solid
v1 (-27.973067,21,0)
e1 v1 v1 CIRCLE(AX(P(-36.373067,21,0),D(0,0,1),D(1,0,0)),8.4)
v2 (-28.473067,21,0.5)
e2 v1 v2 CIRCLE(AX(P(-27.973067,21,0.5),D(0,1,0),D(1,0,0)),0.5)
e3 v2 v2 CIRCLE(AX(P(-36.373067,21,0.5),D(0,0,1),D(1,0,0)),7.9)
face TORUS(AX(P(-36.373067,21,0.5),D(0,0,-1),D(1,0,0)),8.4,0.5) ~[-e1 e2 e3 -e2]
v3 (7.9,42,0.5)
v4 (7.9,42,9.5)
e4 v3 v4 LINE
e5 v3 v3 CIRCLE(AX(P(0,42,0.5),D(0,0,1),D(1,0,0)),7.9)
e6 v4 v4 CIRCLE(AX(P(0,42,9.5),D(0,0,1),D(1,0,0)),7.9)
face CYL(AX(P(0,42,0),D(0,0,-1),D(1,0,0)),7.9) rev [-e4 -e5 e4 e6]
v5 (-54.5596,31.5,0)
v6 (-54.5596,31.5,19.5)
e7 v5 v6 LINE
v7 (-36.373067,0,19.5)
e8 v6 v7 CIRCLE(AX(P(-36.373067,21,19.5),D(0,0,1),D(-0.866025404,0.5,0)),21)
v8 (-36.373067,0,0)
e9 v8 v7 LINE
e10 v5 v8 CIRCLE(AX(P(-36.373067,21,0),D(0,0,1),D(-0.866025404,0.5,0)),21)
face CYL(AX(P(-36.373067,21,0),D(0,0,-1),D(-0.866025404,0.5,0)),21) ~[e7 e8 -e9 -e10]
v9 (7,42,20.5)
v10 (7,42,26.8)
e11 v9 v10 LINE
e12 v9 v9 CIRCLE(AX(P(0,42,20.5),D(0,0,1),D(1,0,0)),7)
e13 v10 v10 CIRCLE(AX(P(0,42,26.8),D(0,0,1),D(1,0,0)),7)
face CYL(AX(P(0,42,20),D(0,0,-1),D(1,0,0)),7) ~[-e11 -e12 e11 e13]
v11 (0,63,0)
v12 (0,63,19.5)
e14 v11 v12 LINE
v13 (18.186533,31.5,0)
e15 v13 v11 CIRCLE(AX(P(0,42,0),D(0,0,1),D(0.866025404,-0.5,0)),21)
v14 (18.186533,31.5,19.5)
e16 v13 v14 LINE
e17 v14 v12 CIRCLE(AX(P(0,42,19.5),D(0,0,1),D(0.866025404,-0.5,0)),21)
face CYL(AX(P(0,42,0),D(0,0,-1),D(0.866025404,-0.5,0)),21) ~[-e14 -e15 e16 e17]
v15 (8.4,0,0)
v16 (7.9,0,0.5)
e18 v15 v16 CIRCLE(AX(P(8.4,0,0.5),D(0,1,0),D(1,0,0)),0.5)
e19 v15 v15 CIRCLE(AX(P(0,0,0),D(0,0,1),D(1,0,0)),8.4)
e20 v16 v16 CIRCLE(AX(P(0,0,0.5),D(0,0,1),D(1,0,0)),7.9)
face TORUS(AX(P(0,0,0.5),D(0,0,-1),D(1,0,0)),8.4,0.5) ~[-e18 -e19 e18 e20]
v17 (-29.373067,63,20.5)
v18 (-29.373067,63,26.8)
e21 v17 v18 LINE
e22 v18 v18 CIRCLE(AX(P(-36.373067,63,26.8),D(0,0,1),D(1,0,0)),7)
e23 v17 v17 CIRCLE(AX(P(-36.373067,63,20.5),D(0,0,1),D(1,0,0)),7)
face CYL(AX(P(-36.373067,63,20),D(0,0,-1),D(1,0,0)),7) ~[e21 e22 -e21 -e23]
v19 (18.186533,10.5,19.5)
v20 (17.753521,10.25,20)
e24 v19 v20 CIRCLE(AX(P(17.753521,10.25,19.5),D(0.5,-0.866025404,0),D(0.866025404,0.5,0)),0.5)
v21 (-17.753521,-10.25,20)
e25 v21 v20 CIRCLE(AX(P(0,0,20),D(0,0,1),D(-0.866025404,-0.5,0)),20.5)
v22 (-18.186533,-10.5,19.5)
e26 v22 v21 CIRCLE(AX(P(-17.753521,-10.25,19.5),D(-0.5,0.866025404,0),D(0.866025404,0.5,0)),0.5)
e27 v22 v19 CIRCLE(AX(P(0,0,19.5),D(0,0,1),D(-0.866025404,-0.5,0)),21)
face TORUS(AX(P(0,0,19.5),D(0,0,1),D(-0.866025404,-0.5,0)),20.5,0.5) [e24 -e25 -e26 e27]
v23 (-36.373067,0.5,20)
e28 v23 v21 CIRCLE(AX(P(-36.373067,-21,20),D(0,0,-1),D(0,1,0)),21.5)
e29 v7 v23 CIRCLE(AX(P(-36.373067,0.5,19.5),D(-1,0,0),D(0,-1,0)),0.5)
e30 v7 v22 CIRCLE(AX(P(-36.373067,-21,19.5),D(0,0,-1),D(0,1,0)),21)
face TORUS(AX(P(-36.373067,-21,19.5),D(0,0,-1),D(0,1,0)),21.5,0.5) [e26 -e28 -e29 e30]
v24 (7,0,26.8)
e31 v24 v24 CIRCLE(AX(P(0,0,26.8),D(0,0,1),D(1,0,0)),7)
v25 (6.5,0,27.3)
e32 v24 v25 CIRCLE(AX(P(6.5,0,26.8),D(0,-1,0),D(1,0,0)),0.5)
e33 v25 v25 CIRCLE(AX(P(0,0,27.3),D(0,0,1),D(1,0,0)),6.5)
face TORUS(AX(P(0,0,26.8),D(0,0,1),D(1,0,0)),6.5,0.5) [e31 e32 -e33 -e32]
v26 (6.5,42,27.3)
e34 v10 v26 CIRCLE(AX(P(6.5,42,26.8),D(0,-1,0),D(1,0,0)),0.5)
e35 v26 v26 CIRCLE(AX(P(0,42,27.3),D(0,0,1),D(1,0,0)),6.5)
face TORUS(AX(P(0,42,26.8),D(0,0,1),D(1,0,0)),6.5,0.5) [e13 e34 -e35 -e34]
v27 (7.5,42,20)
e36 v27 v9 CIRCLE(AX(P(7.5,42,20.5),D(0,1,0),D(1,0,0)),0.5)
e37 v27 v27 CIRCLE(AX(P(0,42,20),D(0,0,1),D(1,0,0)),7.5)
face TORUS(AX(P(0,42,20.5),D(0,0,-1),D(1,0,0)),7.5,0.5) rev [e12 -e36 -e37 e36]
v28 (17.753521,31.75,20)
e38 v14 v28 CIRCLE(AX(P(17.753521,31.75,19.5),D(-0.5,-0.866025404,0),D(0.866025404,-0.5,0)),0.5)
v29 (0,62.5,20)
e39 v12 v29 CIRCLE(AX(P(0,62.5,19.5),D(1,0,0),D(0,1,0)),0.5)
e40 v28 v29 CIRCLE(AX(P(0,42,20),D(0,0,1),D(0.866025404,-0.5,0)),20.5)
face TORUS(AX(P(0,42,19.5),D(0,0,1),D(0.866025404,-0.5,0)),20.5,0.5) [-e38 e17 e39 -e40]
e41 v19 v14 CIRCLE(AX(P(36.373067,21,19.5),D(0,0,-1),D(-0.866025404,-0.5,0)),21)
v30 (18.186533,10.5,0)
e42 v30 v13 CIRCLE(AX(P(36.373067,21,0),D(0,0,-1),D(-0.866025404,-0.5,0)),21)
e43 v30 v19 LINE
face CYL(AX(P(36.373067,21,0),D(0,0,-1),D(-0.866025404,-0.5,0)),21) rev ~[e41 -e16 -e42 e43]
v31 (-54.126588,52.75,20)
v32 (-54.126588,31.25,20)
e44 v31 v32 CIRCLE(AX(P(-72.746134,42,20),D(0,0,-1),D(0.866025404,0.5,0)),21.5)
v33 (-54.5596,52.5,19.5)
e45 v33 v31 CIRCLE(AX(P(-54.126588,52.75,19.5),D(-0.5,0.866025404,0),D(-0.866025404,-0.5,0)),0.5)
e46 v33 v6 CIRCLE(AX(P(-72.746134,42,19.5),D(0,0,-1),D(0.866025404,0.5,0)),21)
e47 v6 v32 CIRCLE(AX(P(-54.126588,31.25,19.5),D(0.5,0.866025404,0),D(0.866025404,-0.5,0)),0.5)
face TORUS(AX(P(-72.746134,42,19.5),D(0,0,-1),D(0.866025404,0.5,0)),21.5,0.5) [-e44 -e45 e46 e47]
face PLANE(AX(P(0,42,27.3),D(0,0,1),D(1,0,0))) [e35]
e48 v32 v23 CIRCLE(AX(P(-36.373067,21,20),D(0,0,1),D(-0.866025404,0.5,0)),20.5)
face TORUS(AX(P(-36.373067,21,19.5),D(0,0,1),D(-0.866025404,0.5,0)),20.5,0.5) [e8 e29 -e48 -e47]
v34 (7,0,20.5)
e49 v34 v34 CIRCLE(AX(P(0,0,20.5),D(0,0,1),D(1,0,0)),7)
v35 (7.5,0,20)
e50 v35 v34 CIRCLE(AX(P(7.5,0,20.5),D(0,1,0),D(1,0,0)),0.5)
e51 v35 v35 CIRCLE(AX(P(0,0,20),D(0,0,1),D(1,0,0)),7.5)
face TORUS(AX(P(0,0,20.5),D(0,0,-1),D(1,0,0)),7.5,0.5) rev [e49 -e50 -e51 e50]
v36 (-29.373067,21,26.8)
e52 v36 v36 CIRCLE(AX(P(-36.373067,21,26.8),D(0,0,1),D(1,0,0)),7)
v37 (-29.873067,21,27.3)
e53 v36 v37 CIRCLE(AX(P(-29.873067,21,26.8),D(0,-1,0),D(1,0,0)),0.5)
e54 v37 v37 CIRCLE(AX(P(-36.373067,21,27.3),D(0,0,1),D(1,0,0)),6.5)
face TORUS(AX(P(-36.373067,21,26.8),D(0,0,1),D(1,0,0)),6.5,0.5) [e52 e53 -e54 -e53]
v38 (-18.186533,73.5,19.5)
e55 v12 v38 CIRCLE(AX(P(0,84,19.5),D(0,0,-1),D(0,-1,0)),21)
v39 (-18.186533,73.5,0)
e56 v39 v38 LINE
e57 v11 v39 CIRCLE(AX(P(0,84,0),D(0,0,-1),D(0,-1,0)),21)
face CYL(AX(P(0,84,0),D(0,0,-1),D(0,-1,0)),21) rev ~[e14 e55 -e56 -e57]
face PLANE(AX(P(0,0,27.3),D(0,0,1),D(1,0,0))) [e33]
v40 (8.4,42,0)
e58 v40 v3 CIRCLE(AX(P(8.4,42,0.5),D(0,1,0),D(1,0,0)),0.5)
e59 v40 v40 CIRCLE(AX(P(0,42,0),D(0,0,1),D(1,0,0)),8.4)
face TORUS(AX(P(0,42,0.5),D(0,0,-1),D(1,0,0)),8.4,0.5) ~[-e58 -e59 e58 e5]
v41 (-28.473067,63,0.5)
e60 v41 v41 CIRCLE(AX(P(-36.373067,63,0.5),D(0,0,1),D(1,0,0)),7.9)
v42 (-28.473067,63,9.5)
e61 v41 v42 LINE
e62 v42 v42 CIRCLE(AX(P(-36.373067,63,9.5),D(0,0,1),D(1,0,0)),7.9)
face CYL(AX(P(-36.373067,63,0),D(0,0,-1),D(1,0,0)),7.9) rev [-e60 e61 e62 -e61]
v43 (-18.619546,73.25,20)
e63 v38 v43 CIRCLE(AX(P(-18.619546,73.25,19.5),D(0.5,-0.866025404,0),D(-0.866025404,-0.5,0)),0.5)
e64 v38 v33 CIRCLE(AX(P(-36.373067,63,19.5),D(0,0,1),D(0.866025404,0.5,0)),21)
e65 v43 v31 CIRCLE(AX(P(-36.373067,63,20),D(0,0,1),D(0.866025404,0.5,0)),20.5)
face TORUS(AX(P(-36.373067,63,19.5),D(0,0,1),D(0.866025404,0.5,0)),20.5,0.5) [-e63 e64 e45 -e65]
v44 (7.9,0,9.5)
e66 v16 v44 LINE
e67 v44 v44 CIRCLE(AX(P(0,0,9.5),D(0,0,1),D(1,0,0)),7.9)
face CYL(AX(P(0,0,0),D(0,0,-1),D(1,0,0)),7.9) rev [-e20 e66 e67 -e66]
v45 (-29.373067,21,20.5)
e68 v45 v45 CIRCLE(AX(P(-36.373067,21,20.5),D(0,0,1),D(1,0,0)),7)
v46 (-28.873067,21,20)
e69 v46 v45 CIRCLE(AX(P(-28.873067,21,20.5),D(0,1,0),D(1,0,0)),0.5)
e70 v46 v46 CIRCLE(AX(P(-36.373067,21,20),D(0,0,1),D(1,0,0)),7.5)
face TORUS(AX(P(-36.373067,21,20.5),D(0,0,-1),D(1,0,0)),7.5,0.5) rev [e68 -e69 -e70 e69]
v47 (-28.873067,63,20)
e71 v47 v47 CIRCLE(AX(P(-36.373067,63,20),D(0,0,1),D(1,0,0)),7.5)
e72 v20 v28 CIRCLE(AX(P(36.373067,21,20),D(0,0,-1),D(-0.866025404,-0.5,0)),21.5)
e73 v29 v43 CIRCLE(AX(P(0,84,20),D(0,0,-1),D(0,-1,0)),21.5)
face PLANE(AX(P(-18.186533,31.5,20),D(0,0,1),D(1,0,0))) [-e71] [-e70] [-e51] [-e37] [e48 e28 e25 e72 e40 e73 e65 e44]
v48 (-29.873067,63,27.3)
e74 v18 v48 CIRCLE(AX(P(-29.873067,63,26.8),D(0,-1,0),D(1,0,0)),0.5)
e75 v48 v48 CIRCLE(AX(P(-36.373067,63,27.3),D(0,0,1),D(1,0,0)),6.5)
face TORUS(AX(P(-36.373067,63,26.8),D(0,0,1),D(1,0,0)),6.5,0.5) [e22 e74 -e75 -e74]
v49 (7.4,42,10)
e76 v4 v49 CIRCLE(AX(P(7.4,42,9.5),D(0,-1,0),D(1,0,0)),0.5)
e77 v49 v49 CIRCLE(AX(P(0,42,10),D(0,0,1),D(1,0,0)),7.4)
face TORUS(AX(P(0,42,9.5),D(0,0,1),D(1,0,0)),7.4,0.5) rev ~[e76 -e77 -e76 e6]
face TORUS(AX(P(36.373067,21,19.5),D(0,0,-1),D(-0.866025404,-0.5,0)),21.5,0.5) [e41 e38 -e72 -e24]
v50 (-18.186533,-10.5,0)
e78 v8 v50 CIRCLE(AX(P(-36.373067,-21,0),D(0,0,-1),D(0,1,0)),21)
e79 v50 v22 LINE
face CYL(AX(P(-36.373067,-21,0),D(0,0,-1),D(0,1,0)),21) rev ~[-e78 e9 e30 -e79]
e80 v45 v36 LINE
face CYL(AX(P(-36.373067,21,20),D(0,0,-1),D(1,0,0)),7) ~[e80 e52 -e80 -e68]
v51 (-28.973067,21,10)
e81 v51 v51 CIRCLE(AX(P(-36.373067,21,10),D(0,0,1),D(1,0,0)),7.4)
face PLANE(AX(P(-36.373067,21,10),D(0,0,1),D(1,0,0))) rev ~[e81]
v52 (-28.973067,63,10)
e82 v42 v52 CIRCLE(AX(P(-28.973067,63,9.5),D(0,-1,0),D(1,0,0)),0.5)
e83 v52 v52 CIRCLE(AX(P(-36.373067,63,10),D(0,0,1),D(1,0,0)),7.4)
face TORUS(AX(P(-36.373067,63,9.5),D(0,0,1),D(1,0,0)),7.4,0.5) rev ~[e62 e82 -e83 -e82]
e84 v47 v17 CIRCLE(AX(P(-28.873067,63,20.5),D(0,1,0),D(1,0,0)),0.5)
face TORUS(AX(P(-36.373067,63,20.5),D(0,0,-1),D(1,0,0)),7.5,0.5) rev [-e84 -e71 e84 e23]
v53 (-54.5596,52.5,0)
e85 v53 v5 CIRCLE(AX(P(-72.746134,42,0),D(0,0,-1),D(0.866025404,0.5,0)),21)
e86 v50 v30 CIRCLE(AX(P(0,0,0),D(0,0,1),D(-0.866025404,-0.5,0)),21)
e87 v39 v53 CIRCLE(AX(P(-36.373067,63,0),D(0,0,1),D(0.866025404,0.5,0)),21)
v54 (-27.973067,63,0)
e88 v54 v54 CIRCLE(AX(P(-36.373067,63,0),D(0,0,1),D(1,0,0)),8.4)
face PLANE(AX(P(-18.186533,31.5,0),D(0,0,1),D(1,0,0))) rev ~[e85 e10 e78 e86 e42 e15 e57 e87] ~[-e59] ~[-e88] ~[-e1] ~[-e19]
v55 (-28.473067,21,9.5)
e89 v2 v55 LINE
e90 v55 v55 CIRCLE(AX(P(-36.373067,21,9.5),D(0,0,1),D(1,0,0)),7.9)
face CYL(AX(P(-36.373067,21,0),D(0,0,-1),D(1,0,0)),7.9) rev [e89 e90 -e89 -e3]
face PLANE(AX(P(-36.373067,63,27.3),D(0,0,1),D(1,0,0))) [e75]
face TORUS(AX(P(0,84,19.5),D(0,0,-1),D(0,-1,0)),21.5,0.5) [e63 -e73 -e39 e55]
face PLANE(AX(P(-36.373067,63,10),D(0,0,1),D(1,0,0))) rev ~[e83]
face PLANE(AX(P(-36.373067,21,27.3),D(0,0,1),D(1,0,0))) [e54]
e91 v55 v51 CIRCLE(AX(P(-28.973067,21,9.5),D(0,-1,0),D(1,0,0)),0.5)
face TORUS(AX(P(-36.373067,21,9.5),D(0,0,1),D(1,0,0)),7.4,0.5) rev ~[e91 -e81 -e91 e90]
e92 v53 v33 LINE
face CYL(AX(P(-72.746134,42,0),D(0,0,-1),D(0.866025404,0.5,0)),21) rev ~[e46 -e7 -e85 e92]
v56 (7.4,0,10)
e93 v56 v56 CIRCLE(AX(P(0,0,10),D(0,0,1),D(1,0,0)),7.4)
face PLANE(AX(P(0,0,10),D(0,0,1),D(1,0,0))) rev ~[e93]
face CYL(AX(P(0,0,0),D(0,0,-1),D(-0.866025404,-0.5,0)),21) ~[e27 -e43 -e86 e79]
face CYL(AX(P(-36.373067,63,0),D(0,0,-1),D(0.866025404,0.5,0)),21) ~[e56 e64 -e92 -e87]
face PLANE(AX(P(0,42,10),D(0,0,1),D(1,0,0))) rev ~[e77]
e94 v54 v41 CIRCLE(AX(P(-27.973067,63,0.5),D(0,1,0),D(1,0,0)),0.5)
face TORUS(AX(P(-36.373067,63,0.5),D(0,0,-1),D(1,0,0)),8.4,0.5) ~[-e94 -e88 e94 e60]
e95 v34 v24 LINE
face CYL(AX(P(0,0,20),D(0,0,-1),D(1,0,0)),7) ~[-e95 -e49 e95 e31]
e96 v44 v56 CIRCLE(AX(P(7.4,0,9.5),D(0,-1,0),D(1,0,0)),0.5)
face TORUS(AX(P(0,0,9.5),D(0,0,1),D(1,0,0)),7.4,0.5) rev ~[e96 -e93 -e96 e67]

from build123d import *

# Parameters (mm, degrees)
F4_R     = 7.9
F5_DEPTH = 20
F6_DEPTH = 10
F7_R     = 7
F8_DEPTH = 7.3
F9_R     = 0.5


# Not quite as in the source:
# - a feature names something its author has since deleted; it is built from what else it names


with BuildPart() as f5:
    # F4 (on Top) → F5 (new body)
    with BuildSketch(Plane.XY):
        with BuildLine():
            ThreePointArc((18.1865334795, 10.5), (15.3730669589, 21), (18.1865334795, 31.5))
            ThreePointArc((18.1865334795, 31.5), (18.1865334795, 52.5), (0, 63))
            ThreePointArc((0, 63), (-10.5, 65.8134665205), (-18.1865334795, 73.5))
            ThreePointArc((-18.1865334795, 73.5), (-46.8730669589, 81.1865334795), (-54.5596004384, 52.5))
            ThreePointArc((-54.5596004384, 52.5), (-51.7461339179, 42), (-54.5596004384, 31.5))
            ThreePointArc((-54.5596004384, 31.5), (-54.5596004384, 10.5), (-36.3730669589, 0))
            ThreePointArc((-36.3730669589, 0), (-25.8730669589, -2.8134665205), (-18.1865334795, -10.5))
            ThreePointArc((-18.1865334795, -10.5), (10.5, -18.1865334795), (18.1865334795, 10.5))
        make_face()
        with Locations((-36.3730669589, 21)):
            Circle(F4_R, mode=Mode.SUBTRACT)
        Circle(F4_R, mode=Mode.SUBTRACT)
        with Locations((-36.3730669589, 63)):
            Circle(F4_R, mode=Mode.SUBTRACT)
        with Locations((0, 42)):
            Circle(F4_R, mode=Mode.SUBTRACT)
        with Locations((0, 42)):
            Circle(F4_R)
        Circle(F4_R)
        with Locations((-36.3730669589, 21)):
            Circle(F4_R)
        with Locations((-36.3730669589, 63)):
            Circle(F4_R)
    extrude(amount=F5_DEPTH)

    # F4 (on Top) → F6 (cut)
    with BuildSketch(Plane.XY):
        with Locations((0, 42)):
            Circle(F4_R)
        Circle(F4_R)
        with Locations((-36.3730669589, 21)):
            Circle(F4_R)
        with Locations((-36.3730669589, 63)):
            Circle(F4_R)
    extrude(amount=F6_DEPTH, mode=Mode.SUBTRACT)

    # F7 (on face) → F8 (join)
    with BuildSketch(Plane.XY.offset(20)):
        Circle(F7_R)
        with Locations((0, 42)):
            Circle(F7_R)
        with Locations((-36.3730669589, 21)):
            Circle(F7_R)
        with Locations((-36.3730669589, 63)):
            Circle(F7_R)
    extrude(amount=F8_DEPTH)

    # F9
    f9_edges = [f5.edges().sort_by_distance(p)[0] for p in [
        (-7, 0, 27.3),
        (-7.9, 42, 0),
        (-7.9, 42, 10),
        (-7.9, 0, 0),
        (-7.9, 0, 10),
        (-7, 42, 27.3),
        (-7, 42, 20),
        (18.186533, 52.5, 20),
        (-43.373067, 21, 20),
        (-43.373067, 21, 27.3),
        (-28.473067, 21, 5),
        (-44.273067, 21, 0),
        (-44.273067, 21, 10),
        (-29.373067, 63, 23.65),
        (-43.373067, 63, 20),
        (-43.373067, 63, 27.3),
        (-28.473067, 63, 5),
        (-44.273067, 63, 0),
        (-44.273067, 63, 10),
        (7, 0, 23.65),
        (-7, 0, 20),
    ]]
    fillet(f9_edges, radius=F9_R)


solid = f5.part
